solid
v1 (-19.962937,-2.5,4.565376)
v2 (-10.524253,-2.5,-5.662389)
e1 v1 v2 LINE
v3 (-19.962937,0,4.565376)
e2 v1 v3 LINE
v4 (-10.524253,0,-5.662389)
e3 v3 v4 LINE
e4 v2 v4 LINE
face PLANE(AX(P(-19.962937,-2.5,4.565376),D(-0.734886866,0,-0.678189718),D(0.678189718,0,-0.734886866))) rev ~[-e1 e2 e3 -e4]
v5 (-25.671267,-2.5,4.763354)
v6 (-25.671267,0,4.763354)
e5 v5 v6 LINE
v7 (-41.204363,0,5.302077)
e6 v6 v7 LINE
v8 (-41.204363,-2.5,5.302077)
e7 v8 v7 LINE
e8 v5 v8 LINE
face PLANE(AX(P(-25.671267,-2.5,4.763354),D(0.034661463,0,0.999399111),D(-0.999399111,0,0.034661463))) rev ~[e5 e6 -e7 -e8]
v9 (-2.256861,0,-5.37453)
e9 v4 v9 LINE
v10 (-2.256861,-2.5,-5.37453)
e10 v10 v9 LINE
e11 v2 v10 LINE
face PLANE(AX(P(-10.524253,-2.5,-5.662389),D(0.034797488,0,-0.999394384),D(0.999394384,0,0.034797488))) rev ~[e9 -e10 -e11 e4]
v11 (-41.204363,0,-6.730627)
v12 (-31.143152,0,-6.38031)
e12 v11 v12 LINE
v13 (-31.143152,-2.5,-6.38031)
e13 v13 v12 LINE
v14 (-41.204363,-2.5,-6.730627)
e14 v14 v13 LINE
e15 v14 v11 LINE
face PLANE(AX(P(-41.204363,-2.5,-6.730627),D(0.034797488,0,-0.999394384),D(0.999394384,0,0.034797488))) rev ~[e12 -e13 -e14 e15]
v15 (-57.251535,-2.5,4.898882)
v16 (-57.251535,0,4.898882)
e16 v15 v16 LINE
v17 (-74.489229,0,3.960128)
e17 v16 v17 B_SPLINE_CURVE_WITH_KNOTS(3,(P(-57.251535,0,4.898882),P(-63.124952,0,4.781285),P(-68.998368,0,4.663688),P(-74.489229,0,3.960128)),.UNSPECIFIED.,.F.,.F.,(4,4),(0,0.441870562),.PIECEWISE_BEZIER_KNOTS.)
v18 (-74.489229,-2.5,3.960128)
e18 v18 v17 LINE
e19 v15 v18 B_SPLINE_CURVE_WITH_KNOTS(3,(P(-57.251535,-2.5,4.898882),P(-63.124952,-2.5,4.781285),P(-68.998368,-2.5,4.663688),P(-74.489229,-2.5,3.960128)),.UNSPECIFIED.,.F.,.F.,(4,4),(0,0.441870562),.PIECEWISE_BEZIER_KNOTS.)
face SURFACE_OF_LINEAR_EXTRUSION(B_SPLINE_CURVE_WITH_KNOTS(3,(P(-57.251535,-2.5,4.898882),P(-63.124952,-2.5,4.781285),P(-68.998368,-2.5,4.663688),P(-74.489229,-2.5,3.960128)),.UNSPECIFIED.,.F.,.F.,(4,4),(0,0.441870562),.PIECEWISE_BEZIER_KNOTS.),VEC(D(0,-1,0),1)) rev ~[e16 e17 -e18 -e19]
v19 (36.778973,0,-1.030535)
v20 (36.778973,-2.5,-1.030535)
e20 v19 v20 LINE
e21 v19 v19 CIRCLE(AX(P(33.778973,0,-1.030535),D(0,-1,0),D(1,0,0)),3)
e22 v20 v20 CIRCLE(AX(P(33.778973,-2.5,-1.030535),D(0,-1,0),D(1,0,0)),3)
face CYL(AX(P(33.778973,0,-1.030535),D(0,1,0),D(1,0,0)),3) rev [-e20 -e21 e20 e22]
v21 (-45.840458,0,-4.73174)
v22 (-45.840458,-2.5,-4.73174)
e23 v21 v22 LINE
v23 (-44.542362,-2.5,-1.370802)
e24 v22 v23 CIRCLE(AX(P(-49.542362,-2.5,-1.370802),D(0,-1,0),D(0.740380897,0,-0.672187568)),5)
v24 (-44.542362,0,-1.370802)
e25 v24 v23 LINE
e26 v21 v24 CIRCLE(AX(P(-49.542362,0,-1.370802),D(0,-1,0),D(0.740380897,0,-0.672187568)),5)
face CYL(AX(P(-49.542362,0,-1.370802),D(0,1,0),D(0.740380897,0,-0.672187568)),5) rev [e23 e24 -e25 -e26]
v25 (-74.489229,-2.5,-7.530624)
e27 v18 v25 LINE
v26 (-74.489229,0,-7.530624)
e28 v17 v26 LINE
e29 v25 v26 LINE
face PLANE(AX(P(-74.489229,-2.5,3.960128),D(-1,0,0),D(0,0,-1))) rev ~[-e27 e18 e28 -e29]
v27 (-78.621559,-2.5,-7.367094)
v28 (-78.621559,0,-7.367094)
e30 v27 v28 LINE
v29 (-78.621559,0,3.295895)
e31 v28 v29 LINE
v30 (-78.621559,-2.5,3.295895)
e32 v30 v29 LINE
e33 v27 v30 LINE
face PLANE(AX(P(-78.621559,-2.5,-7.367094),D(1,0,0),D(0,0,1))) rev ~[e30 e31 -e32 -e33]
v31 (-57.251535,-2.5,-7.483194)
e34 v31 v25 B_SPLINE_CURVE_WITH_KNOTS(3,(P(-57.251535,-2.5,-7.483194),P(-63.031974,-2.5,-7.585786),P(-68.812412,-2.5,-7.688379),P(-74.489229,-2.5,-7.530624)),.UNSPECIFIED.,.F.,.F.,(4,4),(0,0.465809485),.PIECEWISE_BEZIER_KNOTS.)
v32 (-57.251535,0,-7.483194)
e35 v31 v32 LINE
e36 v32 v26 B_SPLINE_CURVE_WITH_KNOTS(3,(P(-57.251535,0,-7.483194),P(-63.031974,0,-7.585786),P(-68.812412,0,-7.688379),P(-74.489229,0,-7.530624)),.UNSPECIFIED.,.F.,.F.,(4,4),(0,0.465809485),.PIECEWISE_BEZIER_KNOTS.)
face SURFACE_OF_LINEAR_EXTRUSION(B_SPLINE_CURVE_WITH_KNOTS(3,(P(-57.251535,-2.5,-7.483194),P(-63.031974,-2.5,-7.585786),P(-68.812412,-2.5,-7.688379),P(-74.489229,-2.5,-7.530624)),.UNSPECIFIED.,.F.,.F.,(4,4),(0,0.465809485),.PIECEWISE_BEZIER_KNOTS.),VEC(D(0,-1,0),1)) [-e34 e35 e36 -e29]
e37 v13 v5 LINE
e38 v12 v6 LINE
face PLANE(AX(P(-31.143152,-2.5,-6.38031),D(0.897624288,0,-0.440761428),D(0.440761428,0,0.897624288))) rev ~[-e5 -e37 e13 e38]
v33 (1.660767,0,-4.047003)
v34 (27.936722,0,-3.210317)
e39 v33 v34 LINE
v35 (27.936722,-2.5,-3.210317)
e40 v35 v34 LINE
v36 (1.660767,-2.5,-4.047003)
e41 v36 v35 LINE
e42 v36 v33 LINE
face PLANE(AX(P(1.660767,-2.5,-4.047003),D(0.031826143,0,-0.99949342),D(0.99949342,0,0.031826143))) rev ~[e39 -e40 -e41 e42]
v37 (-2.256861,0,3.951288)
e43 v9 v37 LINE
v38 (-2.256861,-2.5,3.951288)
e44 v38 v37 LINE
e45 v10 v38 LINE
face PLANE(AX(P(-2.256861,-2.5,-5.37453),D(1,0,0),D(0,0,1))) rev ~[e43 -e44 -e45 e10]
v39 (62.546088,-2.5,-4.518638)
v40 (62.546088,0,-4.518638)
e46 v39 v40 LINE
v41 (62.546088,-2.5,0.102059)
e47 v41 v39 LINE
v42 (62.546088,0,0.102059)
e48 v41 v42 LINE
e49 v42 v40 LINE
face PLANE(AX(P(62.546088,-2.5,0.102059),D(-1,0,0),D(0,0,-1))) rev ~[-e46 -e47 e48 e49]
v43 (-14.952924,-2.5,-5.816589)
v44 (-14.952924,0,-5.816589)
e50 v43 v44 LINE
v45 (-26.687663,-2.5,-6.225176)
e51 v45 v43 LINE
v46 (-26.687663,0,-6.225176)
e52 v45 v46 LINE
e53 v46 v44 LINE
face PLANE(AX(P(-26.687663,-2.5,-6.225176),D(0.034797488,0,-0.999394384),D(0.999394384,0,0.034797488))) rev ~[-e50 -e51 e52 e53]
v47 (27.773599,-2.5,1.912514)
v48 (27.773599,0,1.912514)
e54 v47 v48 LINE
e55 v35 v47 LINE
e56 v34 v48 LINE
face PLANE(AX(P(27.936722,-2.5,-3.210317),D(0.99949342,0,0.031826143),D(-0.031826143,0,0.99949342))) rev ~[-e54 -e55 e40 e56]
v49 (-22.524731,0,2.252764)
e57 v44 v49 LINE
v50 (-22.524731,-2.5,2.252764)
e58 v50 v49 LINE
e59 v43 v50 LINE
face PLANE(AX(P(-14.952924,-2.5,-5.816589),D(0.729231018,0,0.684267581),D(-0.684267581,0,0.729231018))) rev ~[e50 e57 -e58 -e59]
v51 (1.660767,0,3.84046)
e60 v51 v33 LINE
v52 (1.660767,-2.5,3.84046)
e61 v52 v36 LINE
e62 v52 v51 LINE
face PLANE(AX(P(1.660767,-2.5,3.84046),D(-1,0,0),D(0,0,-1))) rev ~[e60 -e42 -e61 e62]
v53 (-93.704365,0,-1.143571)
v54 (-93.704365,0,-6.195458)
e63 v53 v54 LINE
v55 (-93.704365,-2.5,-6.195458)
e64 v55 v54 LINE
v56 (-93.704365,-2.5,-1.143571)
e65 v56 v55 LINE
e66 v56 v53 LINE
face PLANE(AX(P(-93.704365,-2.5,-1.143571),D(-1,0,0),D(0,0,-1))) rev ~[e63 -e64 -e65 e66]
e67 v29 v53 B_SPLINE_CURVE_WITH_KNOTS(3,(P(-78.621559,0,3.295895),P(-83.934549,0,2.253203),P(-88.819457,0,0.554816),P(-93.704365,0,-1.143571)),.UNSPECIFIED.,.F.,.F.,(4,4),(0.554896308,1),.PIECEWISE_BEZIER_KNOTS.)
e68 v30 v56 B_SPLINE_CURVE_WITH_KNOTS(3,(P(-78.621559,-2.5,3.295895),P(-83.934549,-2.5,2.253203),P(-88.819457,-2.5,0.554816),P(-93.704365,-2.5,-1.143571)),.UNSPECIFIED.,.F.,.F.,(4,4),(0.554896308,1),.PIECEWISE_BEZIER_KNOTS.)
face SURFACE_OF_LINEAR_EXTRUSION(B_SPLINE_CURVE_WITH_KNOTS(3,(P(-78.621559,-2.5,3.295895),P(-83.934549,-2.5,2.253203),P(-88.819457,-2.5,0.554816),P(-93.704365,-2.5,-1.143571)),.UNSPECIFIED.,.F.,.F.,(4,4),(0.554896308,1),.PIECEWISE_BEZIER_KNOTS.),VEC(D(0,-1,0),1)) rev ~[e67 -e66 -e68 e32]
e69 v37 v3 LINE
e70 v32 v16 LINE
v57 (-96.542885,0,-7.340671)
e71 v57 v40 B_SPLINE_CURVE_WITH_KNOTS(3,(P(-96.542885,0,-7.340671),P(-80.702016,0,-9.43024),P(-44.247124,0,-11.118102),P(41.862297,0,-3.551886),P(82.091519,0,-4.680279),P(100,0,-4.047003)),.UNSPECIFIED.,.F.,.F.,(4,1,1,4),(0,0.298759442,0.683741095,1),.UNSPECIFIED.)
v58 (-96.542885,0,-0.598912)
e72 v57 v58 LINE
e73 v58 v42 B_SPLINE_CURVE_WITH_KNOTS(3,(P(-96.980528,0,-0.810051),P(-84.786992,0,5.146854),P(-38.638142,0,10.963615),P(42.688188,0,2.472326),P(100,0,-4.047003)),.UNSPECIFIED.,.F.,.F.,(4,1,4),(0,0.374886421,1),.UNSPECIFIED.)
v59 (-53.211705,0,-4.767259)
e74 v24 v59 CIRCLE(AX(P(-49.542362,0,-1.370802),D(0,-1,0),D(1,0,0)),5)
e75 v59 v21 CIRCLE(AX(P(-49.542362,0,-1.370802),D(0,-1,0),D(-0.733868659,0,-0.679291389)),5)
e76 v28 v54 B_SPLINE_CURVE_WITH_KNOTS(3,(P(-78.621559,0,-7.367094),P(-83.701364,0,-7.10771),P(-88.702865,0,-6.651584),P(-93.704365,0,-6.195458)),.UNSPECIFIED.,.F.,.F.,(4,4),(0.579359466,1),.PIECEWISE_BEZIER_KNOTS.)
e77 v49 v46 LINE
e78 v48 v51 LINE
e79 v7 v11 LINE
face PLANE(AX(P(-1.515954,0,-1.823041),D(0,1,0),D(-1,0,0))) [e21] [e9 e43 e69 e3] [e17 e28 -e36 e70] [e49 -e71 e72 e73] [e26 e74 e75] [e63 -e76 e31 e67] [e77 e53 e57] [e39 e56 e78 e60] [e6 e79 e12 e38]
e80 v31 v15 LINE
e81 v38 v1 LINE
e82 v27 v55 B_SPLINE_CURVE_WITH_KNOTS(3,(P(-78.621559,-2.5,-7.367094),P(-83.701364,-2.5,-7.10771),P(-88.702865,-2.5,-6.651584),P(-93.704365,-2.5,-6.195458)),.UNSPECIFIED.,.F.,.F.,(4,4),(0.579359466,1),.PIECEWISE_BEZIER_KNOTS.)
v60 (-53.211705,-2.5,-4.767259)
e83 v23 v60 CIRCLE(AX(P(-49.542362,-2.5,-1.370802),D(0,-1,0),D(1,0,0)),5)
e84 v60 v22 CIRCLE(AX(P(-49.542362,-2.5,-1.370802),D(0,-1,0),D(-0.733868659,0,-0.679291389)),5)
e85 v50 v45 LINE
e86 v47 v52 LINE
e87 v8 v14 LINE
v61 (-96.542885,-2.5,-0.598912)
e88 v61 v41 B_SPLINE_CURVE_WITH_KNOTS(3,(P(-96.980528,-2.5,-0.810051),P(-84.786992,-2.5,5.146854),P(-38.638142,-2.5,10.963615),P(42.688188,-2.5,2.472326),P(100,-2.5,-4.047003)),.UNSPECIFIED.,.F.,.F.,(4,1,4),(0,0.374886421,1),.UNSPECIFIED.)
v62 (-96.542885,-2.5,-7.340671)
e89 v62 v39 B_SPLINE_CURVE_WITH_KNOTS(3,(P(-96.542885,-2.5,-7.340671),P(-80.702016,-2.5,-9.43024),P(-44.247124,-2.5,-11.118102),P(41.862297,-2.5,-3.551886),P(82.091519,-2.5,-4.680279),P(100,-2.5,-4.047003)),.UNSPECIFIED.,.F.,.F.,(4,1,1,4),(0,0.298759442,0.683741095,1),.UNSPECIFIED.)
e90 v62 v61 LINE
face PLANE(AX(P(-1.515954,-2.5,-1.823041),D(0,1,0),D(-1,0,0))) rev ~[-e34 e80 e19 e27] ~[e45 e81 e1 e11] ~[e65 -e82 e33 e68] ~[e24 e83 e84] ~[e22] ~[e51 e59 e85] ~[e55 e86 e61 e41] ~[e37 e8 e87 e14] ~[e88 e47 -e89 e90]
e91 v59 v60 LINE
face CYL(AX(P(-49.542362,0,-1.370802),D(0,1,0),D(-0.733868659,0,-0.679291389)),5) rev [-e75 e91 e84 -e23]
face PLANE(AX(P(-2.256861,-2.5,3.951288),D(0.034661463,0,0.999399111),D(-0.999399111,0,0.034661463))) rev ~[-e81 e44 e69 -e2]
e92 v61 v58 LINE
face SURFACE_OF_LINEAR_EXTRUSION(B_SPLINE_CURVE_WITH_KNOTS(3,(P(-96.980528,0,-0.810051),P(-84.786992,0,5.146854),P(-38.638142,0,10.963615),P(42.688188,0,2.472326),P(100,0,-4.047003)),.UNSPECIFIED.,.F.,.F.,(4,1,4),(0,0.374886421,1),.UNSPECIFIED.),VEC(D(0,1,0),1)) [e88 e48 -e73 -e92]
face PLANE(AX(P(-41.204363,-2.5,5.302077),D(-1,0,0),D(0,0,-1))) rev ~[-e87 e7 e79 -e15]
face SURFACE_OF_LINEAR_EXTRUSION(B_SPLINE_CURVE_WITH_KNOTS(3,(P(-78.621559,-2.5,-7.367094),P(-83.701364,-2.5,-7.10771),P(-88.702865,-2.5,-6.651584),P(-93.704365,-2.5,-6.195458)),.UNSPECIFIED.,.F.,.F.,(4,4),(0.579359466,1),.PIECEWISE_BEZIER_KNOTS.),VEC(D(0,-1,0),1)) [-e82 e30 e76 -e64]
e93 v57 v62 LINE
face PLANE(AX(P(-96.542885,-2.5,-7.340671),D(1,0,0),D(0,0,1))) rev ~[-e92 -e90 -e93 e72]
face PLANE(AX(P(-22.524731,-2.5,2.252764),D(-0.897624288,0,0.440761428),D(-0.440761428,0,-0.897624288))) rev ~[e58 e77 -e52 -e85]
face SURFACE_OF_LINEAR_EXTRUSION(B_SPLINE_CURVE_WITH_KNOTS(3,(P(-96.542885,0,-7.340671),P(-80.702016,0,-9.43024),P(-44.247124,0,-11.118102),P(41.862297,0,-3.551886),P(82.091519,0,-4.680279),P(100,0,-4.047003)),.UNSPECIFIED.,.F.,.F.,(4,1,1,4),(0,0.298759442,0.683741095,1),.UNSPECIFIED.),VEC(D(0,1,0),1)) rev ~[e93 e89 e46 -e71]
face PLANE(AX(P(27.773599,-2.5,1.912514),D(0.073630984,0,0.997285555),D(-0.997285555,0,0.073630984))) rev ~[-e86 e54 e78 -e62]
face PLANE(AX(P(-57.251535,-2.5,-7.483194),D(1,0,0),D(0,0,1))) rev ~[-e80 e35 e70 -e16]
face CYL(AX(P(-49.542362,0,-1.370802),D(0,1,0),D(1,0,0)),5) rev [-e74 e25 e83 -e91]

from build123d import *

# Parameters (mm, degrees)
F2_DEPTH = 2.5
F1_R     = 3
F3_DEPTH = 2.5
F5_DEPTH = 2.5
F6_DEPTH = 2.5
F7_DEPTH = 2.5
F8_DEPTH = 2.5
F9_DEPTH = 2.5


# Not quite as in the source:
# - a feature names something its author has since deleted; it is built from what else it names


with BuildPart() as f2:
    # F0 (on Front) → F2 (new body)
    with BuildSketch(Plane.XZ):
        with BuildLine():
            add(Edge.make_bspline(
                [(-96.9805282175, -0.8100506688), (-84.7869920978, 5.1468541776), (-38.6381415733, 10.9636146396), (42.6881882799, 2.4723259958), (100, -4.047003109)],
                knots=[0, 0, 0, 0, 0.374886421, 1, 1, 1, 1], degree=3))
            add(Edge.make_bspline(
                [(-97.5447368223, -7.1186651935), (-99.939251346, -6.5508492693), (-102.885147974, -5.168950634), (-100.0067471137, -2.3789404522), (-96.9805282175, -0.8100506688)],
                knots=[0.0564585679, 0.0564585679, 0.0564585679, 0.0564585679, 0.4847104148, 1, 1, 1, 1], degree=3))
            add(Edge.make_bspline(
                [(-96.5428845142, -7.3406707446), (-96.8949965543, -7.2673488468), (-97.22905608, -7.1935231869), (-97.5447368223, -7.1186651935)],
                knots=[0, 0, 0, 0, 0.0564585679, 0.0564585679, 0.0564585679, 0.0564585679], degree=3))
            add(Edge.make_bspline(
                [(-96.5428845142, -7.3406707446), (-80.7020161693, -9.4302402111), (-44.2471235075, -11.1181020976), (41.8622965332, -3.5518856086), (82.0915186506, -4.6802794425), (100, -4.047003109)],
                knots=[0, 0, 0, 0, 0.2987594418, 0.6837410955, 1, 1, 1, 1], degree=3))
        make_face()
        with BuildLine():
            add(Edge.make_bspline(
                [(-99.8196757147, -4.047003109), (-99.3821638101, -3.2227137691), (-97.9006497107, -2.3042858417), (-96.3385477662, -1.6362179573)],
                knots=[0.5425000514, 0.5425000514, 0.5425000514, 0.5425000514, 1, 1, 1, 1], degree=3))
            add(Edge.make_bspline(
                [(-96.3385477662, -1.6362179573), (-85.7442874691, 3.2900694446), (-38.7960585931, 10.0747672146), (36.943279708, 1.696590452), (86.094097513, -3.3751911245)],
                knots=[0, 0, 0, 0, 0.384923117, 1, 1, 1, 1], degree=3))
            add(Edge.make_bspline(
                [(-97.3825784566, -6.0471531808), (-82.3468325761, -8.841713568), (-44.2551066449, -8.6286827794), (40.9195716837, -3.3120714751), (72.7341022162, -3.1550192186), (86.094097513, -3.3751911245)],
                knots=[0, 0, 0, 0, 0.3131273629, 0.7122131732, 1, 1, 1, 1], degree=3))
            add(Edge.make_bspline(
                [(-97.3825784566, -6.0471531808), (-98.6588937786, -5.8946130057), (-100.1661659123, -5.1778479876), (-99.9138553768, -4.2244412327), (-99.8196757147, -4.047003109)],
                knots=[0, 0, 0, 0, 0.4440177242, 0.5425000514, 0.5425000514, 0.5425000514, 0.5425000514], degree=3))
        make_face(mode=Mode.SUBTRACT)
        with BuildLine():
            add(Edge.make_bspline(
                [(-96.3385477662, -1.6362179573), (-85.7442874691, 3.2900694446), (-38.7960585931, 10.0747672146), (36.943279708, 1.696590452), (86.094097513, -3.3751911245)],
                knots=[0, 0, 0, 0, 0.384923117, 1, 1, 1, 1], degree=3))
            add(Edge.make_bspline(
                [(-99.8196757147, -4.047003109), (-99.3821638101, -3.2227137691), (-97.9006497107, -2.3042858417), (-96.3385477662, -1.6362179573)],
                knots=[0.5425000514, 0.5425000514, 0.5425000514, 0.5425000514, 1, 1, 1, 1], degree=3))
            add(Edge.make_bspline(
                [(-97.3825784566, -6.0471531808), (-98.6588937786, -5.8946130057), (-100.1661659123, -5.1778479876), (-99.9138553768, -4.2244412327), (-99.8196757147, -4.047003109)],
                knots=[0, 0, 0, 0, 0.4440177242, 0.5425000514, 0.5425000514, 0.5425000514, 0.5425000514], degree=3))
            add(Edge.make_bspline(
                [(-97.3825784566, -6.0471531808), (-82.3468325761, -8.841713568), (-44.2551066449, -8.6286827794), (40.9195716837, -3.3120714751), (72.7341022162, -3.1550192186), (86.094097513, -3.3751911245)],
                knots=[0, 0, 0, 0, 0.3131273629, 0.7122131732, 1, 1, 1, 1], degree=3))
        make_face()
        with BuildLine():
            add(Edge.make_bspline(
                [(-96.5428845142, -7.3406707446), (-96.8949965543, -7.2673488468), (-97.22905608, -7.1935231869), (-97.5447368223, -7.1186651935)],
                knots=[0, 0, 0, 0, 0.0564585679, 0.0564585679, 0.0564585679, 0.0564585679], degree=3))
            ThreePointArc((-97.5447368223, -7.1186651935), (-97.052492706, -7.2688477084), (-96.5428845142, -7.3406707446))
        make_face()
    extrude(amount=F2_DEPTH)


with BuildPart() as f2b:
    # F1 (on Front) → F2, piece 2 (new body)
    with BuildSketch(Plane.XZ):
        with Locations((33.7789729238, -1.0305350879)):
            Circle(F1_R)
    extrude(amount=F2_DEPTH)


with BuildPart() as f2c:
    # F1 (on Front) → F2, piece 3 (new body)
    with BuildSketch(Plane.XZ):
        with BuildLine():
            ThreePointArc((-44.542362095, -1.3708024857), (-51.3662704709, 3.2846629299), (-53.2117053896, -4.7672594318))
            Line((-53.2117053896, -4.7672594318), (-45.8404576082, -4.7317403266))
            ThreePointArc((-45.8404576082, -4.7317403266), (-44.8781621403, -3.1722571154), (-44.542362095, -1.3708024857))
        make_face()
        with BuildLine():
            Line((-45.8404576082, -4.7317403266), (-53.2117053896, -4.7672594318))
            ThreePointArc((-53.2117053896, -4.7672594318), (-49.5182693675, -6.3707444394), (-45.8404576082, -4.7317403266))
        make_face()
    extrude(amount=F2_DEPTH)


with BuildPart() as f3_tool:
    # F1 (on Front) → F3 (new body)
    with BuildSketch(Plane.XZ):
        with BuildLine():
            ThreePointArc((-44.542362095, -1.3708024857), (-51.3662704709, 3.2846629299), (-53.2117053896, -4.7672594318))
            Line((-53.2117053896, -4.7672594318), (-45.8404576082, -4.7317403266))
            ThreePointArc((-45.8404576082, -4.7317403266), (-44.8781621403, -3.1722571154), (-44.542362095, -1.3708024857))
        make_face()
        with BuildLine():
            Line((-45.8404576082, -4.7317403266), (-53.2117053896, -4.7672594318))
            ThreePointArc((-53.2117053896, -4.7672594318), (-49.5182693675, -6.3707444394), (-45.8404576082, -4.7317403266))
        make_face()
        with Locations((33.7789729238, -1.0305350879)):
            Circle(F1_R)
    extrude(amount=F3_DEPTH)


with BuildPart() as f2_1:
    add(f2.part)

    # F3: cut by f3_tool
    add(f3_tool.part, mode=Mode.SUBTRACT)

    # F4 (on face) → F5 (cut)
    with BuildSketch(Plane.XZ.offset(2.5)):
        with BuildLine():
            Line((-96.5428845142, -7.3406707446), (-96.5428845142, -0.5989118026))
            add(Edge.make_bspline(
                [(-96.9805282175, -0.8100506688), (-96.8353706427, -0.7391368787), (-96.6894893165, -0.6687582494), (-96.5428845142, -0.5989118026)],
                knots=[0, 0, 0, 0, 0.0044628238, 0.0044628238, 0.0044628238, 0.0044628238], degree=3))
            add(Edge.make_bspline(
                [(-96.9805282175, -0.8100506688), (-100.0067471137, -2.3789404522), (-102.885147974, -5.168950634), (-99.939251346, -6.5508492693), (-97.5447368223, -7.1186651935)],
                knots=[0.0564585679, 0.0564585679, 0.0564585679, 0.0564585679, 0.5717481532, 1, 1, 1, 1], degree=3))
            ThreePointArc((-97.5447368223, -7.1186651935), (-97.052492706, -7.2688477084), (-96.5428845142, -7.3406707446))
        make_face()
    extrude(amount=-F5_DEPTH, mode=Mode.SUBTRACT)

    # F4 (on face) → F6 (cut)
    with BuildSketch(Plane.XZ.offset(2.5)):
        with BuildLine():
            Line((-78.6215588156, -7.3670944992), (-78.6215588156, 3.2958948603))
            add(Edge.make_bspline(
                [(-78.6215588156, 3.2958948603), (-83.9345486349, 2.2532028855), (-88.8194569144, 0.5548157735), (-93.7043651938, -1.1435713386)],
                knots=[0.554896308, 0.554896308, 0.554896308, 0.554896308, 1, 1, 1, 1], degree=3))
            Line((-93.7043651938, -1.1435713386), (-93.7043651938, -6.1954581179))
            add(Edge.make_bspline(
                [(-78.6215588156, -7.3670944992), (-83.7013643272, -7.1077100258), (-88.7028647605, -6.6515840718), (-93.7043651938, -6.1954581179)],
                knots=[0.5793594661, 0.5793594661, 0.5793594661, 0.5793594661, 1, 1, 1, 1], degree=3))
        make_face()
        with BuildLine():
            Line((-57.251535356, -7.4831936508), (-57.251535356, 4.8988820054))
            add(Edge.make_bspline(
                [(-57.251535356, 4.8988820054), (-63.1249518816, 4.7812850577), (-68.9983684072, 4.66368811), (-74.4892291338, 3.9601280834)],
                knots=[0, 0, 0, 0, 0.4418705618, 0.4418705618, 0.4418705618, 0.4418705618], degree=3))
            Line((-74.4892291338, 3.9601280834), (-74.4892291338, -7.5306241193))
            add(Edge.make_bspline(
                [(-57.251535356, -7.4831936508), (-63.0319736557, -7.5857864832), (-68.8124119553, -7.6883793156), (-74.4892291338, -7.5306241193)],
                knots=[0, 0, 0, 0, 0.4658094847, 0.4658094847, 0.4658094847, 0.4658094847], degree=3))
        make_face()
        Polygon((27.7735989974, 1.9125135442), (1.6607665457, 3.840460399), (1.6607665457, -4.047003109), (27.9367215699, -3.2103169474), align=None)
    extrude(amount=-F6_DEPTH, mode=Mode.SUBTRACT)

    # F4 (on face) → F7 (cut)
    with BuildSketch(Plane.XZ.offset(2.5)):
        with BuildLine():
            add(Edge.make_bspline(
                [(62.5460875734, 0.1020588345), (74.6514883615, -1.1873862537), (87.1633646635, -2.586811085), (100, -4.047003109)],
                knots=[0.8599877614, 0.8599877614, 0.8599877614, 0.8599877614, 1, 1, 1, 1], degree=3))
            Line((62.5460875734, 0.1020588345), (62.5460875734, -4.518638291))
            add(Edge.make_bspline(
                [(62.5460875734, -4.518638291), (75.9097127299, -4.3829595873), (88.0075171585, -4.4710790211), (100, -4.047003109)],
                knots=[0.7882160183, 0.7882160183, 0.7882160183, 0.7882160183, 1, 1, 1, 1], degree=3))
        make_face()
    extrude(amount=-F7_DEPTH, mode=Mode.SUBTRACT)

    # F4 (on face) → F8 (cut)
    with BuildSketch(Plane.XZ.offset(2.5)):
        with BuildLine():
            Line((-78.6215588156, -7.3670944992), (-78.6215588156, 3.2958948603))
            add(Edge.make_bspline(
                [(-78.6215588156, 3.2958948603), (-83.9345486349, 2.2532028855), (-88.8194569144, 0.5548157735), (-93.7043651938, -1.1435713386)],
                knots=[0.554896308, 0.554896308, 0.554896308, 0.554896308, 1, 1, 1, 1], degree=3))
            Line((-93.7043651938, -1.1435713386), (-93.7043651938, -6.1954581179))
            add(Edge.make_bspline(
                [(-78.6215588156, -7.3670944992), (-83.7013643272, -7.1077100258), (-88.7028647605, -6.6515840718), (-93.7043651938, -6.1954581179)],
                knots=[0.5793594661, 0.5793594661, 0.5793594661, 0.5793594661, 1, 1, 1, 1], degree=3))
        make_face()
        with BuildLine():
            Line((-57.251535356, -7.4831936508), (-57.251535356, 4.8988820054))
            add(Edge.make_bspline(
                [(-57.251535356, 4.8988820054), (-63.1249518816, 4.7812850577), (-68.9983684072, 4.66368811), (-74.4892291338, 3.9601280834)],
                knots=[0, 0, 0, 0, 0.4418705618, 0.4418705618, 0.4418705618, 0.4418705618], degree=3))
            Line((-74.4892291338, 3.9601280834), (-74.4892291338, -7.5306241193))
            add(Edge.make_bspline(
                [(-57.251535356, -7.4831936508), (-63.0319736557, -7.5857864832), (-68.8124119553, -7.6883793156), (-74.4892291338, -7.5306241193)],
                knots=[0, 0, 0, 0, 0.4658094847, 0.4658094847, 0.4658094847, 0.4658094847], degree=3))
        make_face()
        Polygon((-41.2043631077, 5.3020771593), (-41.2043631077, -6.7306268347), (-31.1431517353, -6.3803097993), (-25.6712666077, 4.7633535934), align=None)
        Polygon((27.7735989974, 1.9125135442), (1.6607665457, 3.840460399), (1.6607665457, -4.047003109), (27.9367215699, -3.2103169474), align=None)
    extrude(amount=-F8_DEPTH, mode=Mode.SUBTRACT)

    # F4 (on face) → F9 (cut)
    with BuildSketch(Plane.XZ.offset(2.5)):
        Polygon((-22.5247312337, 2.2527640685), (-26.6876633679, -6.2251760467), (-14.952923861, -5.8165891476), align=None)
        Polygon((-2.2568607237, 3.9512880641), (-19.9629371484, 4.5653755791), (-10.5242531862, -5.6623891488), (-2.2568607237, -5.3745303303), align=None)
        Polygon((27.7735989974, 1.9125135442), (1.6607665457, 3.840460399), (1.6607665457, -4.047003109), (27.9367215699, -3.2103169474), align=None)
        with BuildLine():
            Line((-57.251535356, -7.4831936508), (-57.251535356, 4.8988820054))
            add(Edge.make_bspline(
                [(-57.251535356, 4.8988820054), (-63.1249518816, 4.7812850577), (-68.9983684072, 4.66368811), (-74.4892291338, 3.9601280834)],
                knots=[0, 0, 0, 0, 0.4418705618, 0.4418705618, 0.4418705618, 0.4418705618], degree=3))
            Line((-74.4892291338, 3.9601280834), (-74.4892291338, -7.5306241193))
            add(Edge.make_bspline(
                [(-57.251535356, -7.4831936508), (-63.0319736557, -7.5857864832), (-68.8124119553, -7.6883793156), (-74.4892291338, -7.5306241193)],
                knots=[0, 0, 0, 0, 0.4658094847, 0.4658094847, 0.4658094847, 0.4658094847], degree=3))
        make_face()
        with BuildLine():
            Line((-78.6215588156, -7.3670944992), (-78.6215588156, 3.2958948603))
            add(Edge.make_bspline(
                [(-78.6215588156, 3.2958948603), (-83.9345486349, 2.2532028855), (-88.8194569144, 0.5548157735), (-93.7043651938, -1.1435713386)],
                knots=[0.554896308, 0.554896308, 0.554896308, 0.554896308, 1, 1, 1, 1], degree=3))
            Line((-93.7043651938, -1.1435713386), (-93.7043651938, -6.1954581179))
            add(Edge.make_bspline(
                [(-78.6215588156, -7.3670944992), (-83.7013643272, -7.1077100258), (-88.7028647605, -6.6515840718), (-93.7043651938, -6.1954581179)],
                knots=[0.5793594661, 0.5793594661, 0.5793594661, 0.5793594661, 1, 1, 1, 1], degree=3))
        make_face()
        Polygon((-41.2043631077, 5.3020771593), (-41.2043631077, -6.7306268347), (-31.1431517353, -6.3803097993), (-25.6712666077, 4.7633535934), align=None)
    extrude(amount=-F9_DEPTH, mode=Mode.SUBTRACT)


with BuildPart() as f2b_1:
    add(f2b.part)

    # F3: cut by f3_tool
    add(f3_tool.part, mode=Mode.SUBTRACT)


with BuildPart() as f2c_1:
    add(f2c.part)

    # F3: cut by f3_tool
    add(f3_tool.part, mode=Mode.SUBTRACT)


solid = f2_1.part
